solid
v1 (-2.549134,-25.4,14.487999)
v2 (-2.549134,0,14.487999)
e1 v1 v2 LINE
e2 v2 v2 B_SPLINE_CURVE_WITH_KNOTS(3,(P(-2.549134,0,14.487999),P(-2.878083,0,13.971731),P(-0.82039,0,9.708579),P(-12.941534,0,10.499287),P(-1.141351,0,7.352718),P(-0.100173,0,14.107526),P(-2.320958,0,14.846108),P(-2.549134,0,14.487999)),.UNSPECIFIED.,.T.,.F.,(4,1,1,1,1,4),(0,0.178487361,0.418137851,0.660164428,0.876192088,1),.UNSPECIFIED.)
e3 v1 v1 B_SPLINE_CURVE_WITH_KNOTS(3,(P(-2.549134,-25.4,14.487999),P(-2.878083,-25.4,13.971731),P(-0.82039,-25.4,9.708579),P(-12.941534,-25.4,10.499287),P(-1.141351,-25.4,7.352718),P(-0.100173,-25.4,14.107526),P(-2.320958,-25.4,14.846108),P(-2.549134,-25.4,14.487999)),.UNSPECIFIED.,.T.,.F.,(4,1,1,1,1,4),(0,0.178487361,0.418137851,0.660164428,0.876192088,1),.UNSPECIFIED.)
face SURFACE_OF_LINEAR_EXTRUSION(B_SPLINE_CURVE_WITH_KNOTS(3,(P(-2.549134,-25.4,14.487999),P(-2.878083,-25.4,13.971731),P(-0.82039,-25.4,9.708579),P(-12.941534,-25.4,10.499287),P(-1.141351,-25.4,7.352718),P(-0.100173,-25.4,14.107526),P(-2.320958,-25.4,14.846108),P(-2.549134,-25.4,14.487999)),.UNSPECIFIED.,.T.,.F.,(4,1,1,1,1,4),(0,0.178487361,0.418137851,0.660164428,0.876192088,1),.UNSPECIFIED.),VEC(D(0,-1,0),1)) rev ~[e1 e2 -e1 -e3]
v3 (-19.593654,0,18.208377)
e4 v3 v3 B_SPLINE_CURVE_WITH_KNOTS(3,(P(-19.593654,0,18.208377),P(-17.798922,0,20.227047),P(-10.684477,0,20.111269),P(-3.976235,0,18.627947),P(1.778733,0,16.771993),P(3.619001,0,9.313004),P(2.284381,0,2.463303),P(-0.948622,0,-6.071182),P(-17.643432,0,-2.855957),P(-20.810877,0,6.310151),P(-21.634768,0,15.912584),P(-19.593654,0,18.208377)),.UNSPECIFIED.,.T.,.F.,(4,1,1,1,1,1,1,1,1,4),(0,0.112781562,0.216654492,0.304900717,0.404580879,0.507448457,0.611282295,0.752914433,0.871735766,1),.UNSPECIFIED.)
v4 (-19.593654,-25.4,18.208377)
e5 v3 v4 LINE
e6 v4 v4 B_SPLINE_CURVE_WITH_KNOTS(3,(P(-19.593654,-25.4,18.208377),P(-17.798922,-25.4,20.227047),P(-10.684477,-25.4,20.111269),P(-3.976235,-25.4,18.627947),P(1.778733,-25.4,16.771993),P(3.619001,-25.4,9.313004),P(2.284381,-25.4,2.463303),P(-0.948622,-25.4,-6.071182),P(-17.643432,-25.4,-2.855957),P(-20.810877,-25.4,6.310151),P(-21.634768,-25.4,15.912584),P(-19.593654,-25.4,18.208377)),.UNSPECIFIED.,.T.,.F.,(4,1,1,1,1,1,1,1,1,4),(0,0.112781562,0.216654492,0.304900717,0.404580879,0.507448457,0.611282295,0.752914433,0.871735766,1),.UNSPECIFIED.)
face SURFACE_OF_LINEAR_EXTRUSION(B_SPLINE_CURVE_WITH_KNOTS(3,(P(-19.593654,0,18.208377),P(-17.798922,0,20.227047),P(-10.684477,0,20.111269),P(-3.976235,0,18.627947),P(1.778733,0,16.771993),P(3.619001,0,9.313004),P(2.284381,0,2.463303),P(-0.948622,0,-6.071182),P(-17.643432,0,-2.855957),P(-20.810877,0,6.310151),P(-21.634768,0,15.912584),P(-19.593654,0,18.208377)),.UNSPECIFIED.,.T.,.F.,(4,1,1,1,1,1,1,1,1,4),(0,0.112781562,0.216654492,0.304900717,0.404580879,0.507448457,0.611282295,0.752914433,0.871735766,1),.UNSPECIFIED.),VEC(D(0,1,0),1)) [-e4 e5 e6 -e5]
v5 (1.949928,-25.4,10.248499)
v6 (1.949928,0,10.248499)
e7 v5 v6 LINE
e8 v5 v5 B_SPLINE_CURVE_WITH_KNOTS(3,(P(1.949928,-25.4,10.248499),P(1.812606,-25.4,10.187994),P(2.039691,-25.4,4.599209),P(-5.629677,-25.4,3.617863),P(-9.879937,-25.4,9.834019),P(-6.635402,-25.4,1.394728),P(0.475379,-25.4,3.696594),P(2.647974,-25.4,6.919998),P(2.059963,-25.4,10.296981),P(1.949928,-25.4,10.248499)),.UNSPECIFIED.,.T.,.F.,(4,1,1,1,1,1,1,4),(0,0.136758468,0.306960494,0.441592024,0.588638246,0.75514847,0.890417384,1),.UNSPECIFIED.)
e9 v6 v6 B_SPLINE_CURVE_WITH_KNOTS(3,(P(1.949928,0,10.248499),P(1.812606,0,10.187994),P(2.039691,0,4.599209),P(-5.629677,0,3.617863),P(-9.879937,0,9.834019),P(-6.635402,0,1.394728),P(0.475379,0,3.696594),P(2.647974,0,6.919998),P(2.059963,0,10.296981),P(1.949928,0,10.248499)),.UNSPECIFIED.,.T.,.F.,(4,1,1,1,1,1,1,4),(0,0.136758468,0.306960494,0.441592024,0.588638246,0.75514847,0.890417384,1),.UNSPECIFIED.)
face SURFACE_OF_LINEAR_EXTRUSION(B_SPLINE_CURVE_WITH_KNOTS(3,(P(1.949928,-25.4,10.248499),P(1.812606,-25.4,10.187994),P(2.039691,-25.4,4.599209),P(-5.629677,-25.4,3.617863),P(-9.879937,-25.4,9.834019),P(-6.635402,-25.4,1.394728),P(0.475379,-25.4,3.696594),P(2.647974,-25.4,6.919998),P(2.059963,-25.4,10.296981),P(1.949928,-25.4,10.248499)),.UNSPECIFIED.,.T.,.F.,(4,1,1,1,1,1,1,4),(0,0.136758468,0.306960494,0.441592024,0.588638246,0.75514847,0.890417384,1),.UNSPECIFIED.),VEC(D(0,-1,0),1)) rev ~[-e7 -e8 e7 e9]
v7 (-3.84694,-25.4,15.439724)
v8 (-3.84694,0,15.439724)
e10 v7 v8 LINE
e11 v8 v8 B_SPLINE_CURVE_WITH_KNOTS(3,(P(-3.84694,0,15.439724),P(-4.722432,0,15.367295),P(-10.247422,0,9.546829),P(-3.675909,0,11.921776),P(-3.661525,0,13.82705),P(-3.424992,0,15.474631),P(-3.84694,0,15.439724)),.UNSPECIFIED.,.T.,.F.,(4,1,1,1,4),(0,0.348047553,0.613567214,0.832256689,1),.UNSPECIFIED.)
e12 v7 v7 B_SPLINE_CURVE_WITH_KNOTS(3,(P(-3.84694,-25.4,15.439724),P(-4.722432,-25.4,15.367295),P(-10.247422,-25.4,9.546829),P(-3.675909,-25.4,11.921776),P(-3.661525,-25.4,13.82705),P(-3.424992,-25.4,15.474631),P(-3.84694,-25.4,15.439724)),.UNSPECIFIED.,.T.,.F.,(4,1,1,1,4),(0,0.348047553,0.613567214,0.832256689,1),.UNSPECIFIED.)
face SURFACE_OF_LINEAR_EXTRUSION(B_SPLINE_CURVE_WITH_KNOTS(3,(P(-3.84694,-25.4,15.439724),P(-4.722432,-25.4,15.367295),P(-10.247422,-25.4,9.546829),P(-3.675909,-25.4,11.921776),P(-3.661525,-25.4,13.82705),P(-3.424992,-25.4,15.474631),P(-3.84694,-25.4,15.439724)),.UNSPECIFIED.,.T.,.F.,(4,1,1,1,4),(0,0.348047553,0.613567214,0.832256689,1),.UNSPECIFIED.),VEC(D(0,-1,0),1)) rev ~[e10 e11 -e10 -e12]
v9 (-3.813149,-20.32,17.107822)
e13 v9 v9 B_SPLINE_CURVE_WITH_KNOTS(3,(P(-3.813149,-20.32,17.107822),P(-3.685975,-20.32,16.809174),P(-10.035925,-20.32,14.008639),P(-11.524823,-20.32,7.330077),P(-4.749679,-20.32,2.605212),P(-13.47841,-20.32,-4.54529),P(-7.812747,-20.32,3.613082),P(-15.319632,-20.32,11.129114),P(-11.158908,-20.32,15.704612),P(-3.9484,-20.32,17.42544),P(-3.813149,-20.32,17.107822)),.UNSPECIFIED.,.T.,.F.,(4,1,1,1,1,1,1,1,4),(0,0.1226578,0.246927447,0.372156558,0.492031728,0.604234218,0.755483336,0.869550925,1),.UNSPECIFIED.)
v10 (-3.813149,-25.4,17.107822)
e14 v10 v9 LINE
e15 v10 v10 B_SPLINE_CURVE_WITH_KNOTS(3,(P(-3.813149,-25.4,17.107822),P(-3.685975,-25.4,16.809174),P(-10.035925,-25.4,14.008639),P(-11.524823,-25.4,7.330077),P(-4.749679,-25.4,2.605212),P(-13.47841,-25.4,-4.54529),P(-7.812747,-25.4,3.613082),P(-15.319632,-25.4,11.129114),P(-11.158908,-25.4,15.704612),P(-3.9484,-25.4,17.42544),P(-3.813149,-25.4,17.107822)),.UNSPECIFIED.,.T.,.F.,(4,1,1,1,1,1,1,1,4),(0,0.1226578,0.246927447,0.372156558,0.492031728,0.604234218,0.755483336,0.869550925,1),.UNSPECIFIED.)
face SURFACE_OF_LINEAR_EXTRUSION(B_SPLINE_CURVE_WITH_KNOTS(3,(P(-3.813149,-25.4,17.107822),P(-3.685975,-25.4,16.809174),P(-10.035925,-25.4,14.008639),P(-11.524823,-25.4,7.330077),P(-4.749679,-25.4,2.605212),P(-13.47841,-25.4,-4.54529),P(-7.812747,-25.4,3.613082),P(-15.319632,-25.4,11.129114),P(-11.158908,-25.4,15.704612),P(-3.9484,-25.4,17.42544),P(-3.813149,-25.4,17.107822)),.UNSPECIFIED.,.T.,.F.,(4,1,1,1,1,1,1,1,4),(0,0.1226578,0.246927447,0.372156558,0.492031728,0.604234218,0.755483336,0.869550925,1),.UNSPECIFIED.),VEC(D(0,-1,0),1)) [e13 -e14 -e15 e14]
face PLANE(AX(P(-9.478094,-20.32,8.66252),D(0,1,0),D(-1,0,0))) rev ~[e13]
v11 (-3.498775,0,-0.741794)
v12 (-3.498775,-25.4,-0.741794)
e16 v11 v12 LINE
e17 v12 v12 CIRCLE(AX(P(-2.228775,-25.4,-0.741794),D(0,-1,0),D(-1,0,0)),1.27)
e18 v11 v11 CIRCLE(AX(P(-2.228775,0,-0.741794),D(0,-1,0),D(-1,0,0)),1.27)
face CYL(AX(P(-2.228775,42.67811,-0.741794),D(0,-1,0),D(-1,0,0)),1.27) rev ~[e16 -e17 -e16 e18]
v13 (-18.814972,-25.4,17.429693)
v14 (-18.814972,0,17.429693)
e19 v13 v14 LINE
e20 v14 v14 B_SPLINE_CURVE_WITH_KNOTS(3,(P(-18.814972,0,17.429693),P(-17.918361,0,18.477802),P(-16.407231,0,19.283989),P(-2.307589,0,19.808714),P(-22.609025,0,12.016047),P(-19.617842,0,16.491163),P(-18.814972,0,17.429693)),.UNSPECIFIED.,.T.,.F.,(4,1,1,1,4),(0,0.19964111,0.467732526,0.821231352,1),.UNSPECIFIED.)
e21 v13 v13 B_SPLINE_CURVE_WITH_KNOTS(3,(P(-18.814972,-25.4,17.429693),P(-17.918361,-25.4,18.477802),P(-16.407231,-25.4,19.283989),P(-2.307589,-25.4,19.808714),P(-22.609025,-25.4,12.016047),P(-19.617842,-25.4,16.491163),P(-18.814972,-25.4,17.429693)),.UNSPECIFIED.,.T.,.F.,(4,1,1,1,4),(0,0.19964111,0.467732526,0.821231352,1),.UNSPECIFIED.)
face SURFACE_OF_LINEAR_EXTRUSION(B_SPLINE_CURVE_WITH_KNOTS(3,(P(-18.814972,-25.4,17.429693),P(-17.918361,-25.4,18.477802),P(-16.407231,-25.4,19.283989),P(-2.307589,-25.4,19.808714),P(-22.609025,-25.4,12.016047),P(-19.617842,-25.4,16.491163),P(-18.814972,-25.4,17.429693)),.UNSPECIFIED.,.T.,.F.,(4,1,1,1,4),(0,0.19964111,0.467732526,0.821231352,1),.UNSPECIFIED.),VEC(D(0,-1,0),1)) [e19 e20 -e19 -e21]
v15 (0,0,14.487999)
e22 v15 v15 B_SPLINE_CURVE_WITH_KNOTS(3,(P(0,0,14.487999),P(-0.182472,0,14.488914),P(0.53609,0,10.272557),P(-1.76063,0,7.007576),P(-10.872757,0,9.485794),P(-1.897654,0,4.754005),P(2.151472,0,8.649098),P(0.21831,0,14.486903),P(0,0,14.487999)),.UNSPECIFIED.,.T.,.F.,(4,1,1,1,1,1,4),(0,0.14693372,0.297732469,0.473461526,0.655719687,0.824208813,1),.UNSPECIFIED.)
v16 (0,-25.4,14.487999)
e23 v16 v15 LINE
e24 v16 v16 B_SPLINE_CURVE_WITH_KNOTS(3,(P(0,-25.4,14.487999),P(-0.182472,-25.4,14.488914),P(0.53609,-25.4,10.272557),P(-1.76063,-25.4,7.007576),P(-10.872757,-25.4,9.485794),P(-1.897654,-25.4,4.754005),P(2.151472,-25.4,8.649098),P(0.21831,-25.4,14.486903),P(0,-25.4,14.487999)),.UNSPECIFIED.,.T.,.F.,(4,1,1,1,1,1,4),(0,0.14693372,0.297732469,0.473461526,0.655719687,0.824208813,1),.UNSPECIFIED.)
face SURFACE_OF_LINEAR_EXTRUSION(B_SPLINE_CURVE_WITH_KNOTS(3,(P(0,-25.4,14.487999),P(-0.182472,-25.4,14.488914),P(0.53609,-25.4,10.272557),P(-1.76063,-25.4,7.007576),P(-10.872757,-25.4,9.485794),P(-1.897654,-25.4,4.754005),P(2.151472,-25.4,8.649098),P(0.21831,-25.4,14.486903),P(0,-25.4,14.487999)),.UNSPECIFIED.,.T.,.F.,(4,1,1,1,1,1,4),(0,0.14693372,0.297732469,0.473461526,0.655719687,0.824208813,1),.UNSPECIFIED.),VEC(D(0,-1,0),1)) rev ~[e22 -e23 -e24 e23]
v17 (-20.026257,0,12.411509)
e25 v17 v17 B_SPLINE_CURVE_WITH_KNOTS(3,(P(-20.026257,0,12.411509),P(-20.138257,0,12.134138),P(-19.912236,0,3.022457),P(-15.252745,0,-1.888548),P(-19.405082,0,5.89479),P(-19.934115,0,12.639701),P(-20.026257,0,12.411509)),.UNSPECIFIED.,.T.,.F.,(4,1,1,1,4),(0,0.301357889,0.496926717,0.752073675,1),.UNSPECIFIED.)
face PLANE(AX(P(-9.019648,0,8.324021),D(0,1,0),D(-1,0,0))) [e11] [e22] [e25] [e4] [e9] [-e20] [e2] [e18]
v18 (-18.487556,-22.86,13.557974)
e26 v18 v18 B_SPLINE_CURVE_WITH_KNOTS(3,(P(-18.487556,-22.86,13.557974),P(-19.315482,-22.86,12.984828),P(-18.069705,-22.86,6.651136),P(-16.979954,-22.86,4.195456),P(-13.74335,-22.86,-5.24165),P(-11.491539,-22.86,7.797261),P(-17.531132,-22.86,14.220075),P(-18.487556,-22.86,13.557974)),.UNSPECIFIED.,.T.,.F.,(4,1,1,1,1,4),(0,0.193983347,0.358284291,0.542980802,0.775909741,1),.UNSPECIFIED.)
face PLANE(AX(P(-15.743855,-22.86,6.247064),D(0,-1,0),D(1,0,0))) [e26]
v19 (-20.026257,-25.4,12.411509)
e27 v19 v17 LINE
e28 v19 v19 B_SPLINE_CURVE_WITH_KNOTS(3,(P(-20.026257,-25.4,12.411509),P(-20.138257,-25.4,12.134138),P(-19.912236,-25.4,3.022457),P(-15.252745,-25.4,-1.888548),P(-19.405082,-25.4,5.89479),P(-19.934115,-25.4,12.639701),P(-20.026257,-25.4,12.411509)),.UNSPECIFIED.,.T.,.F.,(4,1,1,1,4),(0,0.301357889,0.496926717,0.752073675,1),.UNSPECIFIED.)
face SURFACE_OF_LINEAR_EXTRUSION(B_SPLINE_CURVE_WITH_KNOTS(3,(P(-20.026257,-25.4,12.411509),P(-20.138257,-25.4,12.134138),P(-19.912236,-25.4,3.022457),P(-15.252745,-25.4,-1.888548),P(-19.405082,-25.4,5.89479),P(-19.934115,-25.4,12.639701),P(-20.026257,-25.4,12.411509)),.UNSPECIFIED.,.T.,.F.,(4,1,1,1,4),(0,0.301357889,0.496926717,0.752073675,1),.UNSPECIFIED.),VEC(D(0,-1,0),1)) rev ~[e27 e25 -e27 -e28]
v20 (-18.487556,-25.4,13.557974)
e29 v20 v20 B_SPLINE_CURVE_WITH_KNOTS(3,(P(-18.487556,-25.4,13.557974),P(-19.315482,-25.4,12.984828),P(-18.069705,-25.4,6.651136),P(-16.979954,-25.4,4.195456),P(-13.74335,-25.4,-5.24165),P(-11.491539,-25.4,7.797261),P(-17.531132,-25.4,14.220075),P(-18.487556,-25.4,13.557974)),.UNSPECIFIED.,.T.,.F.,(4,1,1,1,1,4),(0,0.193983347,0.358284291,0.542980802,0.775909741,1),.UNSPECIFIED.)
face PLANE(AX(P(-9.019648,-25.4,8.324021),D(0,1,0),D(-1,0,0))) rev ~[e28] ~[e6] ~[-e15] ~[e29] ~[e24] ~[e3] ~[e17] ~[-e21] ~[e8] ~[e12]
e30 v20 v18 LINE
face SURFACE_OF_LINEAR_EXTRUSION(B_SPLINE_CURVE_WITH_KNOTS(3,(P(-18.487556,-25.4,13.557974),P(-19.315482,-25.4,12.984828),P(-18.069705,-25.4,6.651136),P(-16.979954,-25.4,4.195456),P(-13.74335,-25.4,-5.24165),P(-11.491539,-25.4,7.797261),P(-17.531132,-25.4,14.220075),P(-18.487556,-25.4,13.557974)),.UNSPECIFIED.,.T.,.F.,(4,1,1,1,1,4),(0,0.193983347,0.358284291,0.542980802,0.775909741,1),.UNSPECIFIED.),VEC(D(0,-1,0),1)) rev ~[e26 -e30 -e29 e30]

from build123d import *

# Parameters (mm, degrees)
F2_DEPTH  = 25.4
F4_DEPTH  = 25.4
F6_D      = 2.54
F8_DEPTH  = 2.54
F10_DEPTH = 5.08
F12_DEPTH = 2.54


with BuildPart() as f2:
    # F1 (on face) → F2 (new body)
    with BuildSketch(Plane.XZ):
        with BuildLine():
            add(Edge.make_bspline(
                [(-19.5936542004, 18.2083770633), (-17.7989219876, 20.227046702), (-10.6844767591, 20.111268629), (-3.9762354129, 18.6279469735), (1.7787329985, 16.7719928214), (3.6190010529, 9.3130036563), (2.2843808579, 2.4633033198), (-0.9486224503, -6.0711815231), (-17.6434316729, -2.8559570949), (-20.8108767682, 6.3101505118), (-21.6347675564, 15.9125841137), (-19.5936542004, 18.2083770633)],
                knots=[0, 0, 0, 0, 0.1127815622, 0.2166544922, 0.3049007165, 0.4045808789, 0.5074484566, 0.6112822946, 0.7529144332, 0.8717357658, 1, 1, 1, 1], degree=3))
        make_face()
    extrude(amount=F2_DEPTH)

    # F3 (on face) → F4 (cut)
    with BuildSketch(Plane.XZ.offset(25.4)):
        with BuildLine():
            add(Edge.make_bspline(
                [(-18.8149716705, 17.4296926707), (-17.918360896, 18.4778018007), (-16.4072310705, 19.2839890325), (-2.3075885354, 19.8087139609), (-22.6090250496, 12.0160473192), (-19.6178418597, 16.491163267), (-18.8149716705, 17.4296926707)],
                knots=[0, 0, 0, 0, 0.19964111, 0.4677325262, 0.8212313522, 1, 1, 1, 1], degree=3))
        make_face()
        with BuildLine():
            add(Edge.make_bspline(
                [(-20.0262572616, 12.4115087092), (-20.1382573386, 12.1341375663), (-19.9122362065, 3.0224567635), (-15.2527453645, -1.8885484621), (-19.4050822571, 5.8947899146), (-19.9341150995, 12.6397012025), (-20.0262572616, 12.4115087092)],
                knots=[0, 0, 0, 0, 0.3013578893, 0.4969267166, 0.752073675, 1, 1, 1, 1], degree=3))
        make_face()
        with BuildLine():
            add(Edge.make_bspline(
                [(-3.8469396532, 15.4397236183), (-4.7224321363, 15.3672950619), (-10.2474224349, 9.5468290111), (-3.675909362, 11.9217759182), (-3.6615249721, 13.827050084), (-3.4249915402, 15.4746309343), (-3.8469396532, 15.4397236183)],
                knots=[0, 0, 0, 0, 0.3480475526, 0.6135672143, 0.8322566888, 1, 1, 1, 1], degree=3))
        make_face()
        with BuildLine():
            add(Edge.make_bspline(
                [(-2.5491337292, 14.4879985601), (-2.8780825167, 13.9717314706), (-0.8203898338, 9.7085789362), (-12.941534472, 10.4992873672), (-1.1413514516, 7.3527183071), (-0.1001726568, 14.1075256971), (-2.3209581175, 14.8461076743), (-2.5491337292, 14.4879985601)],
                knots=[0, 0, 0, 0, 0.1784873606, 0.4181378506, 0.6601644277, 0.8761920876, 1, 1, 1, 1], degree=3))
        make_face()
        with BuildLine():
            add(Edge.make_bspline(
                [(0, 14.4879985601), (-0.1824724002, 14.4889138687), (0.5360897106, 10.2725565194), (-1.7606304417, 7.0075757881), (-10.8727567866, 9.48579364), (-1.897654201, 4.7540053355), (2.151472136, 8.6490982831), (0.2183095876, 14.4869034868), (0, 14.4879985601)],
                knots=[0, 0, 0, 0, 0.14693372, 0.297732469, 0.4734615256, 0.6557196875, 0.8242088131, 1, 1, 1, 1], degree=3))
        make_face()
        with BuildLine():
            add(Edge.make_bspline(
                [(1.9499284681, 10.2484989911), (1.8126056723, 10.187993905), (2.0396913617, 4.5992089174), (-5.6296770796, 3.6178631481), (-9.8799367059, 9.834018916), (-6.6354019303, 1.394728179), (0.4753794053, 3.6965936669), (2.6479742963, 6.9199975506), (2.0599632715, 10.2969808562), (1.9499284681, 10.2484989911)],
                knots=[0, 0, 0, 0, 0.1367584681, 0.3069604939, 0.4415920238, 0.588638246, 0.7551484699, 0.8904173843, 1, 1, 1, 1], degree=3))
        make_face()
    extrude(amount=-F4_DEPTH, mode=Mode.SUBTRACT)

    # F6 (through all)
    with Locations(Plane(origin=(0, 0, 0), x_dir=(1, 0, 0), z_dir=(0, 1, 0))):
        with Locations((-2.228774596, 0.7417942397)):
            Hole(F6_D / 2)

    # F7 (on face) → F8 (cut)
    with BuildSketch(Plane.XZ.offset(25.4)):
        with BuildLine():
            add(Edge.make_bspline(
                [(-18.4875559062, 13.5579742491), (-19.3154822408, 12.9848281708), (-18.0697050928, 6.6511359386), (-16.9799538782, 4.1954561535), (-13.7433502687, -5.2416502841), (-11.4915391718, 7.7972606227), (-17.5311324309, 14.2200746573), (-18.4875559062, 13.5579742491)],
                knots=[0, 0, 0, 0, 0.193983347, 0.3582842909, 0.5429808015, 0.7759097408, 1, 1, 1, 1], degree=3))
        make_face()
    extrude(amount=-F8_DEPTH, mode=Mode.SUBTRACT)

    # F9 (on face) → F10 (cut)
    with BuildSketch(Plane.XZ.offset(25.4)):
        with BuildLine():
            add(Edge.make_bspline(
                [(-3.813148709, 17.107822001), (-3.6859754444, 16.809173885), (-10.0359252297, 14.0086392851), (-11.5248229669, 7.3300771967), (-4.7496793502, 2.6052117682), (-13.4784097518, -4.545289679), (-7.8127471121, 3.6130816702), (-15.3196319816, 11.1291138173), (-11.1589079567, 15.7046122726), (-3.9484000723, 17.4254403695), (-3.813148709, 17.107822001)],
                knots=[0, 0, 0, 0, 0.1226578002, 0.2469274469, 0.3721565583, 0.4920317284, 0.6042342176, 0.7554833356, 0.8695509253, 1, 1, 1, 1], degree=3))
        make_face()
    extrude(amount=-F10_DEPTH, mode=Mode.SUBTRACT)

    # F11 (on face) → F12 (join)
    with BuildSketch(Plane.XZ):
        with BuildLine():
            add(Edge.make_bspline(
                [(-7.5533334166, 16.0078406334), (-9.6134745729, 15.5015447096), (-12.939547657, 15.0528311828), (-18.5589879203, 14.2233845171), (-18.7383844377, 7.9567087911), (-15.5469458631, 1.2369371191), (-10.0917759326, -3.7645611405), (-1.9947567807, 0.1309326934), (-10.1031345222, 3.5347732827), (-10.4824045873, 10.4919778205), (-7.4844304912, 14.1528648853), (-2.2335307907, 17.56169165), (-5.9152217774, 16.4104194776), (-7.5533334166, 16.0078406334)],
                knots=[0, 0, 0, 0, 0.0942118734, 0.1789337345, 0.2673375082, 0.3759387605, 0.4788723113, 0.5684768295, 0.6629971261, 0.7602378038, 0.8495687287, 0.9250878679, 1, 1, 1, 1], degree=3))
        make_face()
    extrude(amount=F12_DEPTH)


solid = f2.part
